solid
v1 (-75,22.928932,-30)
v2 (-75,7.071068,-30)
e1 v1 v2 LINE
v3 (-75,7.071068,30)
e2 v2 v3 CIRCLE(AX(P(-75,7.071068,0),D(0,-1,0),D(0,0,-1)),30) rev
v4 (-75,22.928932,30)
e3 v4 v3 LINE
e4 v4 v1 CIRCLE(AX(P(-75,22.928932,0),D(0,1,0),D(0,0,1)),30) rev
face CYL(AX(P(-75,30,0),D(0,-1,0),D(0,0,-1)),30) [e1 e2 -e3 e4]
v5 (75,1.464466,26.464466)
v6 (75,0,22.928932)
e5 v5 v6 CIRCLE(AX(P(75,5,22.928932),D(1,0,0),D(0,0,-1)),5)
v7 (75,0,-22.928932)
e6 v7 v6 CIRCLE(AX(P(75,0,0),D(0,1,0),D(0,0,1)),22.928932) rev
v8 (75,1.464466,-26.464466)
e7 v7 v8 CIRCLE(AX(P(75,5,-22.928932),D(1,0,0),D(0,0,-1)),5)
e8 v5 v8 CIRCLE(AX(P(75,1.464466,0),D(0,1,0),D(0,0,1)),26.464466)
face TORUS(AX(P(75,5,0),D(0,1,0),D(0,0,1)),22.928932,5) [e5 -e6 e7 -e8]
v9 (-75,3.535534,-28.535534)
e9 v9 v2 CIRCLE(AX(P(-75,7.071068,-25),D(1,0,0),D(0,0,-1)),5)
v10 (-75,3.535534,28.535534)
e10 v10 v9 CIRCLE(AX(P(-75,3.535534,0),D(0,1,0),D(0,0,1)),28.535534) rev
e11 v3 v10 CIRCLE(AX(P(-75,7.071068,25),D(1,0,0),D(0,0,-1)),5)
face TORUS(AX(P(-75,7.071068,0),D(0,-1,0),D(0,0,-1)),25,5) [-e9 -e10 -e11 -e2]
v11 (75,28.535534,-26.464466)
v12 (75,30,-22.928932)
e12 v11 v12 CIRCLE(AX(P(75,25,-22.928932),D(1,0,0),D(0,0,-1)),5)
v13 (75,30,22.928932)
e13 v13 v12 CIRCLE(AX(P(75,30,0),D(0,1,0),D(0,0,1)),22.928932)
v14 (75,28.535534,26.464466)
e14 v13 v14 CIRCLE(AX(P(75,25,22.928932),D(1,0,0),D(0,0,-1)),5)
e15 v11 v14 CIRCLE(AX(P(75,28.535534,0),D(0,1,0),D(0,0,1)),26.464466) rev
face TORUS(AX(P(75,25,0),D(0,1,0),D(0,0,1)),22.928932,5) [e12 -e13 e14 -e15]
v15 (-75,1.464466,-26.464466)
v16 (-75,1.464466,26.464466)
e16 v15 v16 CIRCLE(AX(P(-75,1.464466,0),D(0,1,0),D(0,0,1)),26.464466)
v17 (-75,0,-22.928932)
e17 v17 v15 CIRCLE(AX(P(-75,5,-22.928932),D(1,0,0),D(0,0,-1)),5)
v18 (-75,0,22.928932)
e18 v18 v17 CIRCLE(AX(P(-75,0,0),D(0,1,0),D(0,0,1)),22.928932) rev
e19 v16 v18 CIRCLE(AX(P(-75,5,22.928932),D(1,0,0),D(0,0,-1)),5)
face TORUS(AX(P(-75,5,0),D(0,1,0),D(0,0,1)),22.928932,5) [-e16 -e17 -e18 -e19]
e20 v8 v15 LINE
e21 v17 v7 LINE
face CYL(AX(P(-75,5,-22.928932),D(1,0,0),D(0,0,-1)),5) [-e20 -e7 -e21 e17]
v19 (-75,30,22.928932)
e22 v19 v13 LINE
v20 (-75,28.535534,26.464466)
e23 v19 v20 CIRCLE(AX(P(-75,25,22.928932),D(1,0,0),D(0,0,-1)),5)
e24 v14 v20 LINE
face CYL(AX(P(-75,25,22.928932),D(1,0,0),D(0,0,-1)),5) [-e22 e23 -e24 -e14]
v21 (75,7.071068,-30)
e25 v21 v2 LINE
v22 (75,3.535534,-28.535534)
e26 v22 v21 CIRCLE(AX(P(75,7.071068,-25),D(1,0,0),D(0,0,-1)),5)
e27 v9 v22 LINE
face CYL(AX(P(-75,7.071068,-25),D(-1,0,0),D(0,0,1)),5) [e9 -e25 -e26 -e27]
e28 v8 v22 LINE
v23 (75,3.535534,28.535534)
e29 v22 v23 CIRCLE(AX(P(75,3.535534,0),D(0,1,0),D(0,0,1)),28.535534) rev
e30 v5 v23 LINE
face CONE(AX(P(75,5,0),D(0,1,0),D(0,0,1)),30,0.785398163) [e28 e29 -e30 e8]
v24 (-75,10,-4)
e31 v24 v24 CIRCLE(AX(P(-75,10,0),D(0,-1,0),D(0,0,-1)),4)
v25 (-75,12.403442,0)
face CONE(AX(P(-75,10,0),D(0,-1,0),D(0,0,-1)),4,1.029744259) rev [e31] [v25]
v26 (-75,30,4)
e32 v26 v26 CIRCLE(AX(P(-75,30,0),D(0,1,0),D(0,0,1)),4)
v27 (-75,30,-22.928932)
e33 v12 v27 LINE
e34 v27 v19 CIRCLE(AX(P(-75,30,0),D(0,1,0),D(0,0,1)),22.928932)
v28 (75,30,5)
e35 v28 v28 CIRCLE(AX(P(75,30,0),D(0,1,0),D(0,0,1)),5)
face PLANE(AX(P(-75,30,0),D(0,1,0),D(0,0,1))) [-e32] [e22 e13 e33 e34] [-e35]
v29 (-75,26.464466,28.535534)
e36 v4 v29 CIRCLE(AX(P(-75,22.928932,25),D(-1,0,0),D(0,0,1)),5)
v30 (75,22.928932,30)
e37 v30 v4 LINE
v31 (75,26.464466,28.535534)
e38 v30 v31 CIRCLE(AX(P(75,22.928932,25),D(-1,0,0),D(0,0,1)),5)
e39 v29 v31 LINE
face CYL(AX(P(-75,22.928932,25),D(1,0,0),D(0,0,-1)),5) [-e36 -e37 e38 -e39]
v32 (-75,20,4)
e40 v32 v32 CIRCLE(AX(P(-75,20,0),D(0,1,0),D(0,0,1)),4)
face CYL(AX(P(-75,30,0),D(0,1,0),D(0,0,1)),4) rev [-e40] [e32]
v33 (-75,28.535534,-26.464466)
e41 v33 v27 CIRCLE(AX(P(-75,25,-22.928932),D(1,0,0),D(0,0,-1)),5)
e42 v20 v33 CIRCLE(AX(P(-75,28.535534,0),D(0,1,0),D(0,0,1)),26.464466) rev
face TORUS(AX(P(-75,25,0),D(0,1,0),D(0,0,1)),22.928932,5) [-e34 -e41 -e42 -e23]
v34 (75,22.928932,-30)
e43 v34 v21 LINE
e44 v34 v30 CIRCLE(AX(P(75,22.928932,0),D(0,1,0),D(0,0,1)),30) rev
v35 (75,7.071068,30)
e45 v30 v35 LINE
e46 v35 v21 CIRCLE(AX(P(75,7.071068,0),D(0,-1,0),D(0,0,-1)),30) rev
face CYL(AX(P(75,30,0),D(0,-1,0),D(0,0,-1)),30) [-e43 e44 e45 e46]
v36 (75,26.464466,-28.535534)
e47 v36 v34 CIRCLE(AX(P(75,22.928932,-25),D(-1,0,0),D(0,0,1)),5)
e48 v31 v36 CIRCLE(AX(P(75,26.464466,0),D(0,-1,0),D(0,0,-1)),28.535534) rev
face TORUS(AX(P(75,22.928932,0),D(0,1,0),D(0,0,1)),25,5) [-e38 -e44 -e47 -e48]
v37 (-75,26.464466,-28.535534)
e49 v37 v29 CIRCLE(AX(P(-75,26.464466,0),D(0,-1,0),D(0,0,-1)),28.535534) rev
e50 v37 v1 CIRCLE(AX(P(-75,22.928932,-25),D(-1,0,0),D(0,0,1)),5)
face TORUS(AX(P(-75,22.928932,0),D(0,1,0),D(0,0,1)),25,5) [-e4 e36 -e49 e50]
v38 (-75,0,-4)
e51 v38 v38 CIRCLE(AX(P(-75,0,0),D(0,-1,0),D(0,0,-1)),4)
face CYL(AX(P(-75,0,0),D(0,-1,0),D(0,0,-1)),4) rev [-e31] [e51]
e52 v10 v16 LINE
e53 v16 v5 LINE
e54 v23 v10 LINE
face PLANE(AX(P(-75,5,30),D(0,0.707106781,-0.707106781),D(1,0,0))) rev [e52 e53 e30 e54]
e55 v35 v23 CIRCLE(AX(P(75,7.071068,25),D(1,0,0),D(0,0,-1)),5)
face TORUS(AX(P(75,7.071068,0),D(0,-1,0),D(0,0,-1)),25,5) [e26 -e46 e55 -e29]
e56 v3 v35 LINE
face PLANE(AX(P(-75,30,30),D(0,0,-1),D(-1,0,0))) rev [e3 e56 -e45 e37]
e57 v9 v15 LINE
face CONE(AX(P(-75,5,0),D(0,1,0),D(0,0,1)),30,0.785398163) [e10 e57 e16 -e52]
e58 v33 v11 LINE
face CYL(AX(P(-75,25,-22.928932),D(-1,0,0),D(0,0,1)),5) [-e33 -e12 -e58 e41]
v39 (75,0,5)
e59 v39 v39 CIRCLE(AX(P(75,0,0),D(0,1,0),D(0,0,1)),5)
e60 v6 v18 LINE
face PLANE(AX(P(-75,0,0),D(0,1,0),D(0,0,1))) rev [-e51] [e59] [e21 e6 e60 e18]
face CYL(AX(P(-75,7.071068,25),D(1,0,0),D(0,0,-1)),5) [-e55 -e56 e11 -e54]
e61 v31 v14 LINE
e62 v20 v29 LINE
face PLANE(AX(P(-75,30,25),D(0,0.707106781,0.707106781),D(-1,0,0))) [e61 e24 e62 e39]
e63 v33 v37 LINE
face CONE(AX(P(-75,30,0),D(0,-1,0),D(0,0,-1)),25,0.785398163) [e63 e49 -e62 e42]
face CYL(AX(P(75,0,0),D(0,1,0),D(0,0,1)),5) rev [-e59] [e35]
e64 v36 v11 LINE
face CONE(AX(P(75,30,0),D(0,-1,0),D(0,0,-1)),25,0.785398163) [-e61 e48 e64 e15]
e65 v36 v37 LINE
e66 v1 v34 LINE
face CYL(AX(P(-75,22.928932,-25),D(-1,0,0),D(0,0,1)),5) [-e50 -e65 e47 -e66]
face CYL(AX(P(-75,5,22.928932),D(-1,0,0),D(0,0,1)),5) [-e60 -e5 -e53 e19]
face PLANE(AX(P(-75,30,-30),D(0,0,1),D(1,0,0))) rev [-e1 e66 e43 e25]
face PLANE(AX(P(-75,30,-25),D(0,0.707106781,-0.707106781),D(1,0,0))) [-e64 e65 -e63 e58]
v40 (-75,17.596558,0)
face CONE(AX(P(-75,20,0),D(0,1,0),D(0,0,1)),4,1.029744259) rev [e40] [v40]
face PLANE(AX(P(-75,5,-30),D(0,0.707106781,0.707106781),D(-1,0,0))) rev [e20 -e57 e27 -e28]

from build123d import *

# Parameters (mm, degrees)
BOSS_EXTRUDE1_DEPTH = 30
SKETCH2_R           = 5
CUT_EXTRUDE1_DEPTH  = 114.247516529
CHAMFER1_SIZE       = 5
FILLET1_R           = 5


# Read off the part's stored shape, not the designer's step: Ø8.0mm Dowel Hole1
with BuildPart() as part:
    # Sketch1 → Boss-Extrude1 (new body)
    with BuildSketch(Plane(origin=(0, 0, 0), x_dir=(1, 0, 0), z_dir=(0, 1, 0))):
        with BuildLine():
            Line((-75, 30), (75, 30))
            ThreePointArc((75, 30), (105, 0), (75, -30))
            Line((75, -30), (-75, -30))
            ThreePointArc((-75, -30), (-105, 0), (-75, 30))
        make_face()
    extrude(amount=BOSS_EXTRUDE1_DEPTH)

    # Sketch2 → Cut-Extrude1 (cut, through all)
    with BuildSketch(Plane(origin=(0, 30, 0), x_dir=(1, 0, 0), z_dir=(0, 1, 0))):
        with Locations(Location((75, 0, 0), (0, 0, 270))):
            Circle(SKETCH2_R)
    extrude(amount=-CUT_EXTRUDE1_DEPTH, mode=Mode.SUBTRACT)

    # Chamfer1
    chamfer1_edges = [part.edges().sort_by_distance(p)[0] for p in [
        (105, 30, 0),
        (0, 30, -30),
        (-105, 30, 0),
        (0, 0, -30),
        (105, 0, 0),
        (0, 0, 30),
        (-105, 0, 0),
        (0, 30, 30),
    ]]
    chamfer(chamfer1_edges, length=CHAMFER1_SIZE)

    # Fillet1
    fillet1_edges = [part.edges().sort_by_distance(p)[0] for p in [
        (0, 25, 30),
        (0, 5, 30),
        (0, 0, -25),
        (-100, 0, 0),
        (100, 0, 0),
        (0, 0, 25),
        (105, 25, 0),
        (105, 5, 0),
        (-105, 25, 0),
        (-105, 5, 0),
        (0, 25, -30),
        (0, 5, -30),
        (0, 30, -25),
        (-100, 30, 0),
        (100, 30, 0),
        (0, 30, 25),
    ]]
    fillet(fillet1_edges, radius=FILLET1_R)

    # Ø8.0mm Dowel Hole1 outline → Ø8.0mm Dowel Hole1 (revolve, cut)
    with BuildSketch(Plane(origin=(-75, 0, 0), x_dir=(1, 0, 0), z_dir=(0, 0, 1))):
        Polygon((0, 30), (0, 17.596557524), (4, 20), (4, 30), align=None)
        Polygon((4, 10), (0, 12.403442476), (0, 0), (4, 0), align=None)
    revolve(axis=Axis((-75, 0, 0), (0, 1, 0)), mode=Mode.SUBTRACT)


solid = part.part
